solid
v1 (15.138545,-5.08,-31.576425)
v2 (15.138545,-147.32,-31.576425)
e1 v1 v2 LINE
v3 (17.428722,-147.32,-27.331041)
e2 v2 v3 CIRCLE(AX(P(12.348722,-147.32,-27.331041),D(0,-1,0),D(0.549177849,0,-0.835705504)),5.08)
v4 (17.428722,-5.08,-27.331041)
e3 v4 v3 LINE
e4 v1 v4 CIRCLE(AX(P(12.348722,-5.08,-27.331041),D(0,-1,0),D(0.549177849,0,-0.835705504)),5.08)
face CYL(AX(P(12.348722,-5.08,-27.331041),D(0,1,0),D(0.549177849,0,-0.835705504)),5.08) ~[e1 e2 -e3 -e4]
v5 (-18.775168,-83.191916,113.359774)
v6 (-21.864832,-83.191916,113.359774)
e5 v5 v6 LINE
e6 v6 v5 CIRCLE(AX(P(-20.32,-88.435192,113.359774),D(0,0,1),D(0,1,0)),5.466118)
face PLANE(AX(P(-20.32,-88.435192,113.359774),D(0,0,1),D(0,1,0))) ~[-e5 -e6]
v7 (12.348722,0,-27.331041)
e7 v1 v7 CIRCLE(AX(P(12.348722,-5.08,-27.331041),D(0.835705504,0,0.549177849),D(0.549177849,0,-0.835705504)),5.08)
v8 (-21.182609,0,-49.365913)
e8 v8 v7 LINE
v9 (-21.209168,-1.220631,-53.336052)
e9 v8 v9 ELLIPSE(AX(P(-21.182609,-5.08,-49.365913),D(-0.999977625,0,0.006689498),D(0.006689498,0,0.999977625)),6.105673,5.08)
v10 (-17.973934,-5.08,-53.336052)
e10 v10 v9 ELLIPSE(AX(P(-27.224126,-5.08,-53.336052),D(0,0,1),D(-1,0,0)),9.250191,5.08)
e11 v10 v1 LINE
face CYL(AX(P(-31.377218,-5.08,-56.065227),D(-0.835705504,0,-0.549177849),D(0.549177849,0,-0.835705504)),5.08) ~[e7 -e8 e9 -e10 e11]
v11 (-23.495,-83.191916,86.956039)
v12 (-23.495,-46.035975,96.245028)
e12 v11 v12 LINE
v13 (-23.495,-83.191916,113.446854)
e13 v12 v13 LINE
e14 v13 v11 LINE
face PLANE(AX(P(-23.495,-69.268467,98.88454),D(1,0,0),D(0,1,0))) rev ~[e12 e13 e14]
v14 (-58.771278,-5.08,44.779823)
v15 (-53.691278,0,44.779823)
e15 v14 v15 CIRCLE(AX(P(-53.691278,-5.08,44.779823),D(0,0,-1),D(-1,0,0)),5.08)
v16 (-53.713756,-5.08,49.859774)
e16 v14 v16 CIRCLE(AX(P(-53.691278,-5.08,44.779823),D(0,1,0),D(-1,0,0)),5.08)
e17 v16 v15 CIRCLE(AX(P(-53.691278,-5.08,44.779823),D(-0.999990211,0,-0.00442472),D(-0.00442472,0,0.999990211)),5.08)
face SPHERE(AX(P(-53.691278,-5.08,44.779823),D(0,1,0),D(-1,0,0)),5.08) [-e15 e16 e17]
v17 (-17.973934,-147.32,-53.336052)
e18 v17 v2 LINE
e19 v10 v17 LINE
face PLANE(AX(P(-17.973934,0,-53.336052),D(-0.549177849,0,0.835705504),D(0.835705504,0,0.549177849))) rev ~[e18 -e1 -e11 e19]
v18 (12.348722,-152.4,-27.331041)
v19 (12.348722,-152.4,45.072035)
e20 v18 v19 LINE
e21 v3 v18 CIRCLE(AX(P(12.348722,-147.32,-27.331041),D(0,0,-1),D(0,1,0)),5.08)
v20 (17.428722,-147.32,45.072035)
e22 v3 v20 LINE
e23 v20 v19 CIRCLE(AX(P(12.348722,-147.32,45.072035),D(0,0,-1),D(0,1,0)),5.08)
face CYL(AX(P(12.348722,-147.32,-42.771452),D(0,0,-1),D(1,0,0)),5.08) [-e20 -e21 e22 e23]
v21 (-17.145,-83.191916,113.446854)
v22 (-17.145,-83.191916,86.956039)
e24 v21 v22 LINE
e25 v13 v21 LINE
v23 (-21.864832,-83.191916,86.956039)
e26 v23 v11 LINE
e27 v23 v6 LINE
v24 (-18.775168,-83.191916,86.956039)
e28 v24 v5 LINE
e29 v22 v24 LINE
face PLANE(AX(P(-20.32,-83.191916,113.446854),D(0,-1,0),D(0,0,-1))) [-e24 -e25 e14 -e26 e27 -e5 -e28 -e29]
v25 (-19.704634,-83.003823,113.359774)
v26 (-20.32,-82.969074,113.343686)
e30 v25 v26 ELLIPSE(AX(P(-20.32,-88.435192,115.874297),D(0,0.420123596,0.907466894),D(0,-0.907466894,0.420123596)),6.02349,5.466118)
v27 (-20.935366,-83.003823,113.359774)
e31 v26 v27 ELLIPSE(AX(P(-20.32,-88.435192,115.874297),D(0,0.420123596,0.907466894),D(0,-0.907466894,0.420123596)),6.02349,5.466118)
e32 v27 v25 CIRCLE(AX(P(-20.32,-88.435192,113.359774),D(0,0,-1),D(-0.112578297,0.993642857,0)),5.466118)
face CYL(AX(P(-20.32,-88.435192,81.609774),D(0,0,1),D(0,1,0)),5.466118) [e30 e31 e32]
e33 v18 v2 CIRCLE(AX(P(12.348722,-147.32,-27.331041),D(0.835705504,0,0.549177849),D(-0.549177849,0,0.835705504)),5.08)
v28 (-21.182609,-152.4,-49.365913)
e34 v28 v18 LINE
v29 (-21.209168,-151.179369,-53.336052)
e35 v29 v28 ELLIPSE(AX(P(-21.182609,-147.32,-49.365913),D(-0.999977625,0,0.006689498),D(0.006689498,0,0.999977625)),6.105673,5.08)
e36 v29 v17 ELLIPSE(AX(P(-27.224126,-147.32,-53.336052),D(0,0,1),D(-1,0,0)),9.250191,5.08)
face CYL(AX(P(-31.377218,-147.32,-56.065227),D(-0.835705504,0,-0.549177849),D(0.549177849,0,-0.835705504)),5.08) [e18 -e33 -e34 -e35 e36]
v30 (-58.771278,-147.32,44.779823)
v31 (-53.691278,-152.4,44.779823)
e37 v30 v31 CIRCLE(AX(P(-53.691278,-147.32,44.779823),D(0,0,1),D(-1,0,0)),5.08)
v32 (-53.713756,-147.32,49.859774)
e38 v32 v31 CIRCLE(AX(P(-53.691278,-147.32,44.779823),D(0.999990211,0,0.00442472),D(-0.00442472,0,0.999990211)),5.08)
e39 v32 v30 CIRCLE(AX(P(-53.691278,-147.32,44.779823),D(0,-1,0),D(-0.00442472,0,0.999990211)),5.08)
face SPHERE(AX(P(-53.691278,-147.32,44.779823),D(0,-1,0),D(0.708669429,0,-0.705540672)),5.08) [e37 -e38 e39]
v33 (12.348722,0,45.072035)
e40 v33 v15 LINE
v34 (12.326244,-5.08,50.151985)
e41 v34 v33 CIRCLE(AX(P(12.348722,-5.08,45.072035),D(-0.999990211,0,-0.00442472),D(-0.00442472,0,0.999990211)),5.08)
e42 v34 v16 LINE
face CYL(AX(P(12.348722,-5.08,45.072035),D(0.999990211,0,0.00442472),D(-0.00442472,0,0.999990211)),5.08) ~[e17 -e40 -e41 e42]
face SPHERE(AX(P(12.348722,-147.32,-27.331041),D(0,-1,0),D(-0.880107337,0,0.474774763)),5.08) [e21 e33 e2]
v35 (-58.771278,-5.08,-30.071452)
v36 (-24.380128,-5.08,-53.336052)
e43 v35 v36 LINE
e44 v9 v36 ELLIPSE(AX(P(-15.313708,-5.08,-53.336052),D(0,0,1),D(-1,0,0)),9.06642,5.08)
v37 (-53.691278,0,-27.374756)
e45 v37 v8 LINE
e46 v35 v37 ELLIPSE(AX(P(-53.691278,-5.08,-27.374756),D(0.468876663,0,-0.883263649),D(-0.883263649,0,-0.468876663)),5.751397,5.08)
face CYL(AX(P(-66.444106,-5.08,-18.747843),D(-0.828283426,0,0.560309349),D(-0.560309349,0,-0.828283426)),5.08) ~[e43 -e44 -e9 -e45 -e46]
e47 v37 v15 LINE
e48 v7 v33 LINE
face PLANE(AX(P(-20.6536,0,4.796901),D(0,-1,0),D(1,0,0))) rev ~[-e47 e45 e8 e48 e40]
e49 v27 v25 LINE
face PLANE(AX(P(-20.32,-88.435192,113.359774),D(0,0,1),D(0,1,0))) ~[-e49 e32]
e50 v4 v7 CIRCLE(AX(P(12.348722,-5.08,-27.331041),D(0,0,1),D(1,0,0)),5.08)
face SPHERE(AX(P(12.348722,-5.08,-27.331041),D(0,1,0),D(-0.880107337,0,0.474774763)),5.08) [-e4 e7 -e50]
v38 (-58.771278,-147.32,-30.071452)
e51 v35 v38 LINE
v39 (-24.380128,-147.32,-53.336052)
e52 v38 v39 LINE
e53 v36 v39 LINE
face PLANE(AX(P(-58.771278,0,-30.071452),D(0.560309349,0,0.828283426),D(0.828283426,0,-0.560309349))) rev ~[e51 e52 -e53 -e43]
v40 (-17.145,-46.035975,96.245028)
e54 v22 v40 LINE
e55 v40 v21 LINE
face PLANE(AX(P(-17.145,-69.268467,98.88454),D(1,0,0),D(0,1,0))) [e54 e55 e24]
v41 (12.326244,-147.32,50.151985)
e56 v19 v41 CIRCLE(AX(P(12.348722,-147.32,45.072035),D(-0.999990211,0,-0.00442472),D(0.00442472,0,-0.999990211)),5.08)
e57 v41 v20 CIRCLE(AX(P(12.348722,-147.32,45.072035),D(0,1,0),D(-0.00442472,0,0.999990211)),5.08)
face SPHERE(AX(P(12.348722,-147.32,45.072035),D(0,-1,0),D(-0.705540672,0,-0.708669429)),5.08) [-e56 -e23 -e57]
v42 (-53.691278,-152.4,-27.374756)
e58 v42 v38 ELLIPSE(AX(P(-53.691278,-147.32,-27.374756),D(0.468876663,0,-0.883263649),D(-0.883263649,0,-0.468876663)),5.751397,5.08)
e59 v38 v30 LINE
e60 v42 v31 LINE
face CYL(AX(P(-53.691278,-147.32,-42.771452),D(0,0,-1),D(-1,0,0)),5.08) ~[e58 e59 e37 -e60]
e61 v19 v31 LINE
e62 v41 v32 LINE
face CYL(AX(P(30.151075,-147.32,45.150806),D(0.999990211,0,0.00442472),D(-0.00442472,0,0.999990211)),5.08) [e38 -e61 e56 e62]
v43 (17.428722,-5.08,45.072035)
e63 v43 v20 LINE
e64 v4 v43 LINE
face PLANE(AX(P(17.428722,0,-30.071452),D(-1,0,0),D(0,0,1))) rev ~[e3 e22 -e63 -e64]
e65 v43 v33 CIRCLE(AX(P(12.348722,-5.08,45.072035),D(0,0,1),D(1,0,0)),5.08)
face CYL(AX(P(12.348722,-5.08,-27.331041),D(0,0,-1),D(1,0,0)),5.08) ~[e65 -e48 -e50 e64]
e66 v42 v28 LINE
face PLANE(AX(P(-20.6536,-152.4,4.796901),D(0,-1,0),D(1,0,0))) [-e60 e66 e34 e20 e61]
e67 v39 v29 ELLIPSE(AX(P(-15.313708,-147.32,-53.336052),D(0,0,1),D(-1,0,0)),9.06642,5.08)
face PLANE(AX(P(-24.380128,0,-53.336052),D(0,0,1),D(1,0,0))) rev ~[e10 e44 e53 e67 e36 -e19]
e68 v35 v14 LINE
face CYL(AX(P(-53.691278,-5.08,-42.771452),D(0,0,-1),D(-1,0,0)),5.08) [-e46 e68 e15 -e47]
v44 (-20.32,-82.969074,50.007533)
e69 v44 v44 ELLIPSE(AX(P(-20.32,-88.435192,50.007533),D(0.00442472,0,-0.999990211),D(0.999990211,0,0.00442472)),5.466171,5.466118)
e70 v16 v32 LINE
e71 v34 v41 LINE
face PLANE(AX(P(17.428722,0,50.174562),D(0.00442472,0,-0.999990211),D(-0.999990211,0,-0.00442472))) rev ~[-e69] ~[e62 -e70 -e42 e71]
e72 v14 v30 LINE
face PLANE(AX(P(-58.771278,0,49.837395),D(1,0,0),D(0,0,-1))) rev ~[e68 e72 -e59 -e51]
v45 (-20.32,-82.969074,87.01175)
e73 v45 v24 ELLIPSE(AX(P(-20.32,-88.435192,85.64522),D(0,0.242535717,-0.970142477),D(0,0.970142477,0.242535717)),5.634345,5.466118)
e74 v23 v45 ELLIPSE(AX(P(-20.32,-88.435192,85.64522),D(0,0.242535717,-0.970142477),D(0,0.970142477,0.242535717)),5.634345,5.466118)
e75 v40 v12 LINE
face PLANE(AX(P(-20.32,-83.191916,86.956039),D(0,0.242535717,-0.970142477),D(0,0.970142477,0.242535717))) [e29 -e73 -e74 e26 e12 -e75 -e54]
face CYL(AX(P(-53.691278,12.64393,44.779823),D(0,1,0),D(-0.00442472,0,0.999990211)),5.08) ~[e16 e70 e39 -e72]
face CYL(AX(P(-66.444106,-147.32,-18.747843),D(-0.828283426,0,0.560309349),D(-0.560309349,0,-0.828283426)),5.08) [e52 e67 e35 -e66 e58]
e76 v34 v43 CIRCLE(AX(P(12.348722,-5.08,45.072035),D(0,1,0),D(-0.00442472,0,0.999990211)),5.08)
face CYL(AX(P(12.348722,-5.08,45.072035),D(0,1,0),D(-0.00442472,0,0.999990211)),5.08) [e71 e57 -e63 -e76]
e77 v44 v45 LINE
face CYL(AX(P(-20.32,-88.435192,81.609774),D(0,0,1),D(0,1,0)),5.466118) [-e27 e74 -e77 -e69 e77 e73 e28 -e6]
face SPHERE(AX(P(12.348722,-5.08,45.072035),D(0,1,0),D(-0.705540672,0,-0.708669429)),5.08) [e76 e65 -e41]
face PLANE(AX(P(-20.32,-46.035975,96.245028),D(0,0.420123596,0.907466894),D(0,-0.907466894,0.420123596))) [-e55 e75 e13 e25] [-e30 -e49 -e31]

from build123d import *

# Parameters (mm, degrees)
F1_DEPTH     = 152.4
F2_T1_DEPTH  = 159.9639298233
F2_T3_DEPTH  = 87.5512753886
F2_T5_DEPTH  = 105.6460143168
F2_T7_DEPTH  = 83.8431740092
F2_T9_DEPTH  = 66.9209927252
F2_T11_DEPTH = 67.7625979145
F2_T16_DEPTH = 5.08
F4_W         = 5.4661177176
F4_H         = 63.5
F7_DEPTH     = 3.175
F8_T1_DEPTH  = 142.24
F8_T3_DEPTH  = 87.5512753886
F8_T5_DEPTH  = 66.9209927252
F8_T7_DEPTH  = 52.3221869503
F8_T9_DEPTH  = 72.4030758235
F8_T11_DEPTH = 66.0406464801
F8_T16_DEPTH = 5.08
F8_T22_DEPTH = 5.08
F8_T28_DEPTH = 5.08
F8_T34_DEPTH = 5.08
F8_T38_ANGLE = 89.746481368


# Not quite as in the source:
# - a fillet or chamfer that OpenCascade refuses, or shapes differently, is made with other operations: its cross-section is extruded or revolved along the edge and cut away or added


with BuildPart() as f1:
    # F0 (on Front) → F1 (new body)
    with BuildSketch(Plane.XZ):
        Polygon((17.4287217617, 50.174562376), (-58.7712782383, 49.8373953771), (-58.7712782383, -30.0714519408), (-24.3801281386, -53.3360523395), (-17.9739344996, -53.3360523395), (17.4287217617, -30.0714519408), align=None)
    extrude(amount=F1_DEPTH)

    # F2: fillet of radius 5.08 on 6 edges, made by hand

    # F2_s2 → F2_t1 (cut)
    with BuildSketch(Plane.XZ.offset(-12.6439298233)):
        with BuildLine():
            ThreePointArc((-53.7137558182, 49.859773719), (-57.2913189399, 48.3639700613), (-58.7712782383, 44.7798234478))
            Line((-58.7712782383, 44.7798234478), (-58.7712782383, 49.8373953771))
            Line((-58.7712782383, 49.8373953771), (-53.7137558182, 49.859773719))
        make_face()
    extrude(amount=F2_T1_DEPTH, mode=Mode.SUBTRACT)

    # F2_s4 → F2_t3 (cut)
    with BuildSketch(Plane.XY.offset(-42.7714519408)):
        with BuildLine():
            ThreePointArc((-58.7712782383, -147.32), (-57.2833806867, -150.9121024484), (-53.6912782383, -152.4))
            Line((-53.6912782383, -152.4), (-58.7712782383, -152.4))
            Line((-58.7712782383, -152.4), (-58.7712782383, -147.32))
        make_face()
    extrude(amount=F2_T3_DEPTH, mode=Mode.SUBTRACT)

    # F2_s6 → F2_t5 (cut)
    with BuildSketch(Plane.XY.offset(-42.7714519408)):
        with BuildLine():
            ThreePointArc((17.4287217617, -147.32), (15.9408242101, -150.9121024484), (12.3487217617, -152.4))
            Line((12.3487217617, -152.4), (17.4287217617, -152.4))
            Line((17.4287217617, -152.4), (17.4287217617, -147.32))
        make_face()
    extrude(amount=F2_T5_DEPTH, mode=Mode.SUBTRACT)

    # F2_s8 → F2_t7 (cut)
    with BuildSketch(Plane(origin=(30.3502624567, 0, 0.1342927416), x_dir=(0, 1, 0), z_dir=(-0.9999902109, 0, -0.0044247205))):
        with BuildLine():
            ThreePointArc((-147.32, -50.0969539894), (-150.9121024484, -48.6090564378), (-152.4, -45.0169539894))
            Line((-152.4, -45.0169539894), (-152.4, -50.0969539894))
            Line((-152.4, -50.0969539894), (-147.32, -50.0969539894))
        make_face()
    extrude(amount=F2_T7_DEPTH, mode=Mode.SUBTRACT)

    # F2_s10 → F2_t9 (cut)
    with BuildSketch(Plane(origin=(-36.8834278428, 0, 24.9505529071), x_dir=(0, 1, 0), z_dir=(0.8282834259, 0, -0.5603093489))):
        with BuildLine():
            ThreePointArc((-147.32, -57.8377818767), (-150.9121024484, -56.3498843251), (-152.4, -52.7577818767))
            Line((-152.4, -52.7577818767), (-152.4, -57.8377818767))
            Line((-152.4, -57.8377818767), (-147.32, -57.8377818767))
        make_face()
    extrude(amount=F2_T9_DEPTH, mode=Mode.SUBTRACT)

    # F2_s12 → F2_t11 (cut)
    with BuildSketch(Plane(origin=(-47.6451540495, 0, -31.3096695828), x_dir=(0, 1, 0), z_dir=(0.8357055045, 0, 0.549177849))):
        with BuildLine():
            ThreePointArc((-147.32, -34.7023458418), (-150.9121024484, -33.2144482902), (-152.4, -29.6223458418))
            Line((-152.4, -29.6223458418), (-152.4, -34.7023458418))
            Line((-152.4, -34.7023458418), (-147.32, -34.7023458418))
        make_face()
    extrude(amount=F2_T11_DEPTH, mode=Mode.SUBTRACT)


with BuildPart() as f2_tool14:
    # F2_s15 → F2_t16 (new body)
    with BuildSketch(Plane.XZ.offset(147.32)):
        Polygon((-53.6912782383, 44.7798234478), (-53.7137558182, 49.859773719), (-58.7712782383, 49.8373953771), (-58.7712782383, 44.7798234478), align=None)
    extrude(amount=F2_T16_DEPTH)

    # F2_s17 → F2_t18 (revolve, cut)
    with BuildSketch(Plane(origin=(-53.6912782383, -147.32, 44.7798234478), x_dir=(0.7086694294, 0, -0.7055406719), z_dir=(-0.7055406719, 0, -0.7086694294))):
        with BuildLine():
            ThreePointArc((0, -5.08), (5.08, 0), (0, 5.08))
            Line((0, 5.08), (0, -5.08))
        make_face()
    revolve(axis=Axis((-53.6912782383, -147.32, 44.7798234478), (0, -1, 0)), mode=Mode.SUBTRACT)


with BuildPart() as f1_1:
    add(f1.part)

    # F2_t13: cut F2_tool14
    add(f2_tool14.part, mode=Mode.SUBTRACT)

    # F4 (on offset) → F5 (revolve)
    with BuildSketch(Plane.YZ.offset(-20.32)):
        with Locations((-85.7021328023, 81.609773719)):
            Rectangle(F4_W, F4_H)
    revolve(axis=Axis((-20.32, -88.4351916611, 88.4142501174), (0, 0, 1)))

    # F6 (on offset) → F7 (join, symmetric)
    with BuildSketch(Plane.YZ.offset(-20.32)):
        Polygon((-46.0359752178, 96.2450280786), (-83.1919163465, 113.4468540549), (-83.1919163465, 86.9560390711), align=None)
    extrude(amount=F7_DEPTH, both=True)

    # F8: fillet of radius 5.08 on 8 edges, made by hand

    # F8_s2 → F8_t1 (cut)
    with BuildSketch(Plane.XZ.offset(5.08)):
        with BuildLine():
            ThreePointArc((12.3262441818, 50.1519851181), (15.9328683752, 48.6720755484), (17.4287217617, 45.0720348468))
            Line((17.4287217617, 45.0720348468), (17.4287217617, 50.174562376))
            Line((17.4287217617, 50.174562376), (12.3262441818, 50.1519851181))
        make_face()
        with BuildLine():
            ThreePointArc((15.1385452344, -31.5764249394), (16.8196670332, -29.7428967724), (17.4287217617, -27.3310409766))
            Line((17.4287217617, -27.3310409766), (17.4287217617, -30.0714519408))
            Line((17.4287217617, -30.0714519408), (15.1385452344, -31.5764249394))
        make_face()
    extrude(amount=F8_T1_DEPTH, mode=Mode.SUBTRACT)

    # F8_s4 → F8_t3 (cut)
    with BuildSketch(Plane.XY.offset(-42.7714519408)):
        with BuildLine():
            ThreePointArc((-58.7712782383, -5.08), (-57.2833806867, -1.4878975516), (-53.6912782383, 0))
            Line((-53.6912782383, 0), (-58.7712782383, 0))
            Line((-58.7712782383, 0), (-58.7712782383, -5.08))
        make_face()
    extrude(amount=F8_T3_DEPTH, mode=Mode.SUBTRACT)

    # F8_s6 → F8_t5 (cut)
    with BuildSketch(Plane(origin=(-36.8834278428, 0, 24.9505529071), x_dir=(0, 1, 0), z_dir=(0.8282834259, 0, -0.5603093489))):
        with BuildLine():
            ThreePointArc((-5.08, -57.8377818767), (-1.4878975516, -56.3498843251), (0, -52.7577818767))
            Line((0, -52.7577818767), (0, -57.8377818767))
            Line((0, -57.8377818767), (-5.08, -57.8377818767))
        make_face()
    extrude(amount=F8_T5_DEPTH, mode=Mode.SUBTRACT)

    # F8_s8 → F8_t7 (cut)
    with BuildSketch(Plane(origin=(-47.6451540495, 0, -31.3096695828), x_dir=(0, 1, 0), z_dir=(0.8357055045, 0, 0.549177849))):
        with BuildLine():
            ThreePointArc((-5.08, -34.7023458418), (-1.4878975516, -33.2144482902), (0, -29.6223458418))
            Line((0, -29.6223458418), (0, -34.7023458418))
            Line((0, -34.7023458418), (-5.08, -34.7023458418))
        make_face()
    extrude(amount=F8_T7_DEPTH, mode=Mode.SUBTRACT)

    # F8_s10 → F8_t9 (cut)
    with BuildSketch(Plane.XY.offset(-27.3310409766)):
        with BuildLine():
            ThreePointArc((17.4287217617, -5.08), (15.9408242101, -1.4878975516), (12.3487217617, 0))
            Line((12.3487217617, 0), (17.4287217617, 0))
            Line((17.4287217617, 0), (17.4287217617, -5.08))
        make_face()
    extrude(amount=F8_T9_DEPTH, mode=Mode.SUBTRACT)

    # F8_s12 → F8_t11 (cut)
    with BuildSketch(Plane(origin=(12.5479091987, 0, 0.055521534), x_dir=(0, 1, 0), z_dir=(-0.9999902109, 0, -0.0044247205))):
        with BuildLine():
            ThreePointArc((-5.08, -50.0969539894), (-1.4878975516, -48.6090564378), (0, -45.0169539894))
            Line((0, -45.0169539894), (0, -50.0969539894))
            Line((0, -50.0969539894), (-5.08, -50.0969539894))
        make_face()
    extrude(amount=F8_T11_DEPTH, mode=Mode.SUBTRACT)


with BuildPart() as f8_tool14:
    # F8_s15 → F8_t16 (new body)
    with BuildSketch(Plane.XZ.offset(147.32)):
        Polygon((12.3487217617, -27.3310409766), (15.1385452344, -31.5764249394), (17.4287217617, -30.0714519408), (17.4287217617, -27.3310409766), align=None)
    extrude(amount=F8_T16_DEPTH)

    # F8_s17 → F8_t18 (revolve, cut)
    with BuildSketch(Plane(origin=(12.3487217617, -147.32, -27.3310409766), x_dir=(-0.8801073369, 0, 0.4747747629), z_dir=(0.4747747629, 0, 0.8801073369))):
        with BuildLine():
            ThreePointArc((0, -5.08), (5.08, 0), (0, 5.08))
            Line((0, 5.08), (0, -5.08))
        make_face()
    revolve(axis=Axis((12.3487217617, -147.32, -27.3310409766), (0, -1, 0)), mode=Mode.SUBTRACT)


with BuildPart() as f1_2:
    add(f1_1.part)

    # F8_t13: cut F8_tool14
    add(f8_tool14.part, mode=Mode.SUBTRACT)


with BuildPart() as f8_tool20:
    # F8_s21 → F8_t22 (new body)
    with BuildSketch(Plane.XZ.offset(147.32)):
        Polygon((12.3487217617, 45.0720348468), (12.3262441818, 50.1519851181), (17.4287217617, 50.174562376), (17.4287217617, 45.0720348468), align=None)
    extrude(amount=F8_T22_DEPTH)

    # F8_s23 → F8_t24 (revolve, cut)
    with BuildSketch(Plane(origin=(12.3487217617, -147.32, 45.0720348468), x_dir=(-0.7055406719, 0, -0.7086694294), z_dir=(-0.7086694294, 0, 0.7055406719))):
        with BuildLine():
            ThreePointArc((0, -5.08), (5.08, 0), (0, 5.08))
            Line((0, 5.08), (0, -5.08))
        make_face()
    revolve(axis=Axis((12.3487217617, -147.32, 45.0720348468), (0, -1, 0)), mode=Mode.SUBTRACT)


with BuildPart() as f1_3:
    add(f1_2.part)

    # F8_t19: cut F8_tool20
    add(f8_tool20.part, mode=Mode.SUBTRACT)


with BuildPart() as f8_tool26:
    # F8_s27 → F8_t28 (new body)
    with BuildSketch(Plane.XZ.offset(5.08)):
        Polygon((12.3487217617, 45.0720348468), (12.3262441818, 50.1519851181), (17.4287217617, 50.174562376), (17.4287217617, 45.0720348468), align=None)
    extrude(amount=-F8_T28_DEPTH)

    # F8_s29 → F8_t30 (revolve, cut)
    with BuildSketch(Plane(origin=(12.3487217617, -5.08, 45.0720348468), x_dir=(-0.7055406719, 0, -0.7086694294), z_dir=(0.7086694294, 0, -0.7055406719))):
        with BuildLine():
            ThreePointArc((0, -5.08), (5.08, 0), (0, 5.08))
            Line((0, 5.08), (0, -5.08))
        make_face()
    revolve(axis=Axis((12.3487217617, -5.08, 45.0720348468), (0, 1, 0)), mode=Mode.SUBTRACT)


with BuildPart() as f1_4:
    add(f1_3.part)

    # F8_t25: cut F8_tool26
    add(f8_tool26.part, mode=Mode.SUBTRACT)


with BuildPart() as f8_tool32:
    # F8_s33 → F8_t34 (new body)
    with BuildSketch(Plane.XZ.offset(5.08)):
        Polygon((12.3487217617, -27.3310409766), (15.1385452344, -31.5764249394), (17.4287217617, -30.0714519408), (17.4287217617, -27.3310409766), align=None)
    extrude(amount=-F8_T34_DEPTH)

    # F8_s35 → F8_t36 (revolve, cut)
    with BuildSketch(Plane(origin=(12.3487217617, -5.08, -27.3310409766), x_dir=(-0.8801073369, 0, 0.4747747629), z_dir=(-0.4747747629, 0, -0.8801073369))):
        with BuildLine():
            ThreePointArc((0, -5.08), (5.08, 0), (0, 5.08))
            Line((0, 5.08), (0, -5.08))
        make_face()
    revolve(axis=Axis((12.3487217617, -5.08, -27.3310409766), (0, 1, 0)), mode=Mode.SUBTRACT)


with BuildPart() as f1_5:
    add(f1_4.part)

    # F8_t31: cut F8_tool32
    add(f8_tool32.part, mode=Mode.SUBTRACT)

    # F8_s37 → F8_t38 (revolve, cut)
    with BuildSketch(Plane.XY.offset(44.7798234479)):
        with BuildLine():
            ThreePointArc((-58.7712782383, -5.08), (-57.2833806867, -1.4878975516), (-53.6912782383, 0))
            Line((-53.6912782383, 0), (-58.7712782383, 0))
            Line((-58.7712782383, 0), (-58.7712782383, -5.08))
        make_face()
    revolve(axis=Axis((-53.6912782384, 0, 44.7798234479), (0, 1, 0)), revolution_arc=F8_T38_ANGLE, mode=Mode.SUBTRACT)


solid = f1_5.part
